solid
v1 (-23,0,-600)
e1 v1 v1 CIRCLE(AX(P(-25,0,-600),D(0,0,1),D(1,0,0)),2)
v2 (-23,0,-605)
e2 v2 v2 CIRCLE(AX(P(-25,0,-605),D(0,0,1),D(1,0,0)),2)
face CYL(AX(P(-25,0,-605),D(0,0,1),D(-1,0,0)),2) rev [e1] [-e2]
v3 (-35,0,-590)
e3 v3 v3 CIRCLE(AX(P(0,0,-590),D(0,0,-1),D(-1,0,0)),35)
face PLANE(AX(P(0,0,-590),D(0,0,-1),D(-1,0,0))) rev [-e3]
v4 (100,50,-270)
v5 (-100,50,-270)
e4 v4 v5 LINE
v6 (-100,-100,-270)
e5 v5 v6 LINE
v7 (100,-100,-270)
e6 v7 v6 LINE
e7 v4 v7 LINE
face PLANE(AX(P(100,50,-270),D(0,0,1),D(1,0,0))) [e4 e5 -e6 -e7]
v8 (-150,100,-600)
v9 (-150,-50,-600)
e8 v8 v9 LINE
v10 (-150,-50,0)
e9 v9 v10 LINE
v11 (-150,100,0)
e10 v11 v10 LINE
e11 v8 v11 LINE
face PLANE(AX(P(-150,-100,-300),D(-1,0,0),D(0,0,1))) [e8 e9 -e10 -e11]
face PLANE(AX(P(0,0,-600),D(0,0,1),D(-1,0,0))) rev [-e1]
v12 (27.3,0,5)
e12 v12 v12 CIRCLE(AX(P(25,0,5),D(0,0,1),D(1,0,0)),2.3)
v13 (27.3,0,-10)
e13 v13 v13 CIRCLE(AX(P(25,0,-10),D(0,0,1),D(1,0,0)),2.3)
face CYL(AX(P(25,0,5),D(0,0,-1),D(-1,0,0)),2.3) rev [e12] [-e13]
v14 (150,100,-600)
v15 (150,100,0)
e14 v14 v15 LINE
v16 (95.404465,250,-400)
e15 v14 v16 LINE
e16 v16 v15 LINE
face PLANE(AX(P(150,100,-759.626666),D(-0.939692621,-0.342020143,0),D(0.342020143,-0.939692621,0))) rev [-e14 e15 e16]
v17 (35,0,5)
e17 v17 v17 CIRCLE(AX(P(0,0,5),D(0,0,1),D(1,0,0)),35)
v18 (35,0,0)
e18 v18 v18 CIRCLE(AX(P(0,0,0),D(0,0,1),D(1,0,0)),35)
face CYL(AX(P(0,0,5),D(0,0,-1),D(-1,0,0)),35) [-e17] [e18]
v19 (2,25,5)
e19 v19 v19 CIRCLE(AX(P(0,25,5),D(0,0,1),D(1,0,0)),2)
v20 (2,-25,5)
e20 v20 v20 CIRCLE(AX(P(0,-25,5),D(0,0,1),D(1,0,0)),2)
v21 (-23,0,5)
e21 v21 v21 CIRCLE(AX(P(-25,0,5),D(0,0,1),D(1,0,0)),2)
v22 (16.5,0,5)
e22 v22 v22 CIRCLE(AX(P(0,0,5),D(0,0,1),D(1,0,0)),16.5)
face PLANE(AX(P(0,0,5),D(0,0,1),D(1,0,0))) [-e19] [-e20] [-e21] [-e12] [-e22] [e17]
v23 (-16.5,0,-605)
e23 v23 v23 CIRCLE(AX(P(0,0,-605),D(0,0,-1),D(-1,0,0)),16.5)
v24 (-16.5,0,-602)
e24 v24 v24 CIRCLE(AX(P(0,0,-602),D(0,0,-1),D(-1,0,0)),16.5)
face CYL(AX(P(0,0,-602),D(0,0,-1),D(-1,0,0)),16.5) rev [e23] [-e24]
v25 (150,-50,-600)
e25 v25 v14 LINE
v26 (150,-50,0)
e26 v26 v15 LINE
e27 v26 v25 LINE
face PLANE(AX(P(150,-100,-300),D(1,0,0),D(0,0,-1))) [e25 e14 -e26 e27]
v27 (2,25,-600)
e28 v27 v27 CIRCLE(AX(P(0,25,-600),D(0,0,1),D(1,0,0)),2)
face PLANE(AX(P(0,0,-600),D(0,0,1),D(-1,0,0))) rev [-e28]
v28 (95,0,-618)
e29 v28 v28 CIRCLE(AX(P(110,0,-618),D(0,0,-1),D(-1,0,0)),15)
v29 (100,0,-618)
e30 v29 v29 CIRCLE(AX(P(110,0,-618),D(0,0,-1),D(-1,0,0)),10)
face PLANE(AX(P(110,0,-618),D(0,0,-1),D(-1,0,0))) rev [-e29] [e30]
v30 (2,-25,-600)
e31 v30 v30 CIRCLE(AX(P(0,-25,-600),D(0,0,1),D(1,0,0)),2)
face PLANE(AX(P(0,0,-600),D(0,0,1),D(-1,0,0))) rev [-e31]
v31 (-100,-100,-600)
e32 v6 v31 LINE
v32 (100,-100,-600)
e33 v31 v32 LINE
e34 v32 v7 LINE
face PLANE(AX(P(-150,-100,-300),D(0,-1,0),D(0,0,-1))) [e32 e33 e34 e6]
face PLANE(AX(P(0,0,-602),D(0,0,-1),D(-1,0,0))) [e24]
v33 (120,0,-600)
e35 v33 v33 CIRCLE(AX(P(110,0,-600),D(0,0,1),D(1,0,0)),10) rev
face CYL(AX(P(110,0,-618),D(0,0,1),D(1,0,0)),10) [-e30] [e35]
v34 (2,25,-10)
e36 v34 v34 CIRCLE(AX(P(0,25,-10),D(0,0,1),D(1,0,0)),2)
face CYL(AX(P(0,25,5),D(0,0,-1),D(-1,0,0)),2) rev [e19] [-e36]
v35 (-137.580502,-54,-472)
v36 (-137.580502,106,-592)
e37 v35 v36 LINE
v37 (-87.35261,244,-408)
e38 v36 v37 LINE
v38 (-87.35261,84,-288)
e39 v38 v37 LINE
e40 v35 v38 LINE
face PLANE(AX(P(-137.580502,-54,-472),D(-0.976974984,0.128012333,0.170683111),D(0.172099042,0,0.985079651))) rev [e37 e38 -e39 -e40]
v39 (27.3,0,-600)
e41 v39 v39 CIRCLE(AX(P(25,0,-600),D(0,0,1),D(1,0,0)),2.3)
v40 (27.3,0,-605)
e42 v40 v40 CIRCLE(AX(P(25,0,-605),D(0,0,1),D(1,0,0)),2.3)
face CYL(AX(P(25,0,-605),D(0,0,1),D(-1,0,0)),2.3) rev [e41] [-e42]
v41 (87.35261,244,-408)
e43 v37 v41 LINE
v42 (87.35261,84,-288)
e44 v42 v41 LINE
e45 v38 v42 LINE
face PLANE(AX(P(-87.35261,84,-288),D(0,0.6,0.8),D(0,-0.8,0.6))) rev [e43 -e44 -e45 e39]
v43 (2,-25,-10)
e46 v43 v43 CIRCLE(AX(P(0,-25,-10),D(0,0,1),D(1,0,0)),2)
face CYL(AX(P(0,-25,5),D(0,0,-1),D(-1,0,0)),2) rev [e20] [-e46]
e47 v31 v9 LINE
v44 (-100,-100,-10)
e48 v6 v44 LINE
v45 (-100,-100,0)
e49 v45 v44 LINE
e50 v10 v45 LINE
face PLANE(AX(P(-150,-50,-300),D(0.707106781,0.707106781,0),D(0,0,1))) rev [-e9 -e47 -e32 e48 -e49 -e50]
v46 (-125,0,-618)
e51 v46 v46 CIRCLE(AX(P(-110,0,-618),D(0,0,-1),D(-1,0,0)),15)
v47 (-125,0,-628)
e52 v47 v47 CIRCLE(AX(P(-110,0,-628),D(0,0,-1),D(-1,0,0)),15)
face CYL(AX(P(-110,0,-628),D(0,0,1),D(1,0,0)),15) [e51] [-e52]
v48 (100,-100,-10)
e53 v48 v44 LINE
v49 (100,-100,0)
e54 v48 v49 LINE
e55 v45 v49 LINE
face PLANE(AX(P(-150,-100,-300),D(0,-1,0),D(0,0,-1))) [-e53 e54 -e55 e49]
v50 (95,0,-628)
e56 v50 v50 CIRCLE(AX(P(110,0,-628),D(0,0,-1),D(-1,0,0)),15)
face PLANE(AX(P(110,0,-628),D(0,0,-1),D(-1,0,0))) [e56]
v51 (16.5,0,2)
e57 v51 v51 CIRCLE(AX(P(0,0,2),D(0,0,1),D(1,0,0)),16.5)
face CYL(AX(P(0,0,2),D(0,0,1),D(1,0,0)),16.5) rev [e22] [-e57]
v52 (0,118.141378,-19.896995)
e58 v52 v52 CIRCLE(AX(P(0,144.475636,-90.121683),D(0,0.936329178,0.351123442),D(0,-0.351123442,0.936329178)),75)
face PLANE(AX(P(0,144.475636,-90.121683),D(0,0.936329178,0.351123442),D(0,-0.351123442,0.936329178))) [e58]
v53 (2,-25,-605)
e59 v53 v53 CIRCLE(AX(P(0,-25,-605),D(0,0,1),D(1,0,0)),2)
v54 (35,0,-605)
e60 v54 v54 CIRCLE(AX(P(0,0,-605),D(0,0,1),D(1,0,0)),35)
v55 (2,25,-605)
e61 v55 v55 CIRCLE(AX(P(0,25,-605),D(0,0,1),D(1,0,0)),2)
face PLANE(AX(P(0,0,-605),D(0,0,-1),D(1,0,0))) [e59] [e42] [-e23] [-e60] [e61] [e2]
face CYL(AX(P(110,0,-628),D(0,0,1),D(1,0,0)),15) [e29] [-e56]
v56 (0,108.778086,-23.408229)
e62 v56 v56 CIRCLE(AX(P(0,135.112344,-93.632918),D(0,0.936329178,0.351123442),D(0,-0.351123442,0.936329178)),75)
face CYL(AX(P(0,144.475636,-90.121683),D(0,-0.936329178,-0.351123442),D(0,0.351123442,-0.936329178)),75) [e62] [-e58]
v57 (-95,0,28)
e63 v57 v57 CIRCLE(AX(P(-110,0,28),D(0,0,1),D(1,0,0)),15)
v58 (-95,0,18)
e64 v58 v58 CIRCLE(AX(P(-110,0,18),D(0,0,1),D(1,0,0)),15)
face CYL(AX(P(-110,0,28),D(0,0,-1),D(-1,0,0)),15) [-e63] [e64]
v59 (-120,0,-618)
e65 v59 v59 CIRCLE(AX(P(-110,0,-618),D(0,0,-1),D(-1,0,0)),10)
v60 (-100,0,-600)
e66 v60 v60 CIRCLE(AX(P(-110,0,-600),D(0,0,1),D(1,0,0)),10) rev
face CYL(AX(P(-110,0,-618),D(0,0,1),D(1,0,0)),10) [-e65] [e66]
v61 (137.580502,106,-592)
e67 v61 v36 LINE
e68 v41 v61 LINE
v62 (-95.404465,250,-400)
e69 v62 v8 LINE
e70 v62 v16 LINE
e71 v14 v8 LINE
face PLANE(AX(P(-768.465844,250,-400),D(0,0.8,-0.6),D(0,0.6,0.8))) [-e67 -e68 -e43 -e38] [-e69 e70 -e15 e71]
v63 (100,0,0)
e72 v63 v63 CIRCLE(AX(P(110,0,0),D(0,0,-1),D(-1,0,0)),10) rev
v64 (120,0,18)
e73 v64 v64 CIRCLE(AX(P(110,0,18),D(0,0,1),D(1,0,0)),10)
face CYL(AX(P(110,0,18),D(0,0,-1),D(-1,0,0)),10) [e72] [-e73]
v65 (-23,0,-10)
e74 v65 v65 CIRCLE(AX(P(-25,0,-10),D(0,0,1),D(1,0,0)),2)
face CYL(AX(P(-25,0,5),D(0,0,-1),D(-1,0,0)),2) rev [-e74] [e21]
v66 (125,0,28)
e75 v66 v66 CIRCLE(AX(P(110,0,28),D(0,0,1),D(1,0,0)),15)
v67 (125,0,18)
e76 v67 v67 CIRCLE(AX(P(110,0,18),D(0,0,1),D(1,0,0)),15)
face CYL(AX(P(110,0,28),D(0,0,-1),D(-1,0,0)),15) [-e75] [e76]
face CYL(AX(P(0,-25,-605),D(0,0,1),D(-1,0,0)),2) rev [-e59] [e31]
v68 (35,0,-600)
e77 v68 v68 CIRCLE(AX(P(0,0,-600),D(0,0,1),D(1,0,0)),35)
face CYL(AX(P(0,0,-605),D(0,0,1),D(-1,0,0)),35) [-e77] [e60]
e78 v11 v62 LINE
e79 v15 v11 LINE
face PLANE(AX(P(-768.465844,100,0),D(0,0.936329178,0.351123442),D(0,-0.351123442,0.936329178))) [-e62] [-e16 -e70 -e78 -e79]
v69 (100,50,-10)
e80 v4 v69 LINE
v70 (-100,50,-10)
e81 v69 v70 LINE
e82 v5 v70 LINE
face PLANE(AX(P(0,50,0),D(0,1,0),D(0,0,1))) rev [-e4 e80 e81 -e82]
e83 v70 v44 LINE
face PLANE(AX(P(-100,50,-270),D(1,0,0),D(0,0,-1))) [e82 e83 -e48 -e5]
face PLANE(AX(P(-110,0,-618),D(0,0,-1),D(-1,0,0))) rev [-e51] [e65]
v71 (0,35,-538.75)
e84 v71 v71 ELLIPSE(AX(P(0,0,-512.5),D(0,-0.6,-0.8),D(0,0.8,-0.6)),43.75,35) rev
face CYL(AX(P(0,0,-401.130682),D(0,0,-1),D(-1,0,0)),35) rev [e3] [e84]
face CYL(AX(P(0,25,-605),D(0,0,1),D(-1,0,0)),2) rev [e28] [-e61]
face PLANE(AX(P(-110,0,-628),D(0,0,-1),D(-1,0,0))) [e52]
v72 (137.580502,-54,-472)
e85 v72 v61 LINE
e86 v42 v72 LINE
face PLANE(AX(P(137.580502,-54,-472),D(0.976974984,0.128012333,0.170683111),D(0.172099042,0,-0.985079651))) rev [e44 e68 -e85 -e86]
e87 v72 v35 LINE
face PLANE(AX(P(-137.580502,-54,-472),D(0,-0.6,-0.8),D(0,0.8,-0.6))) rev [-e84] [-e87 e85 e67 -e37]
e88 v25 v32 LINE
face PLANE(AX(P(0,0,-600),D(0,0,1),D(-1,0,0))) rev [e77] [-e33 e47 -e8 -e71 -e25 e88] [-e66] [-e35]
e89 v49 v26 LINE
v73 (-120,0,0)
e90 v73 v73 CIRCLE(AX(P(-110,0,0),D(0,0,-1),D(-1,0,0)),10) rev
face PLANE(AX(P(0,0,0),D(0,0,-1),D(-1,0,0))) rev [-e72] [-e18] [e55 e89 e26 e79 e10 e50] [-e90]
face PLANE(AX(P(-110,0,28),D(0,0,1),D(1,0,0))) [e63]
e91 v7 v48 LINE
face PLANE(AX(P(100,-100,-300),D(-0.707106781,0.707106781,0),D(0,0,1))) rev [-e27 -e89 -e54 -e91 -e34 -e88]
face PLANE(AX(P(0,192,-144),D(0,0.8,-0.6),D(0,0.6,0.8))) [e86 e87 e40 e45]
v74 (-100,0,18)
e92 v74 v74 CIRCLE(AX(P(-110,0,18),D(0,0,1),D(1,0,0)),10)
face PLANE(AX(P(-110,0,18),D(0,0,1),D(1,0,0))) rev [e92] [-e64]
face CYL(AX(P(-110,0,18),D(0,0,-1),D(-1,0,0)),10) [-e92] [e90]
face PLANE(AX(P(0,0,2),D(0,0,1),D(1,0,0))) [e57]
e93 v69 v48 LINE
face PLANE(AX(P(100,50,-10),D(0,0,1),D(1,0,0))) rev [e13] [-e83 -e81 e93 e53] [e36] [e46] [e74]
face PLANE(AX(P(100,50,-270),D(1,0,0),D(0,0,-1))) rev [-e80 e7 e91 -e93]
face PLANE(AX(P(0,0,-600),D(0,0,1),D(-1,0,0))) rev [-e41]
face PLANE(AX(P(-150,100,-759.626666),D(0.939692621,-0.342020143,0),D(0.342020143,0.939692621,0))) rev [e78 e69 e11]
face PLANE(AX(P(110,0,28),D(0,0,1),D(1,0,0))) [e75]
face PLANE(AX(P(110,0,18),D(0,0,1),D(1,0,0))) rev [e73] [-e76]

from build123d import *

# Parameters (mm, degrees)
SKETCH3_W            = 300
SKETCH3_H            = 200
BOSS_EXTRUDE2_DEPTH  = 300
SKETCH8_R            = 35
SKETCH8_R_2          = 2
SKETCH8_R_3          = 2.3
BOSS_EXTRUDE7_DEPTH  = 5
BOSS_EXTRUDE8_DEPTH  = 300
SKETCH19_W           = 200
SKETCH19_H           = 260
CUT_EXTRUDE5_DEPTH   = 150
CUT_EXTRUDE3_REACH   = 673.584
CUT_EXTRUDE4_DEPTH   = 200
CHAMFER2_SIZE        = 50
SKETCH4_R            = 10
BOSS_EXTRUDE9_DEPTH  = 18
SKETCH15_R           = 15
BOSS_EXTRUDE10_DEPTH = 10
BOSS_EXTRUDE11_START = 18
SKETCH16_R           = 10
BOSS_EXTRUDE11_DEPTH = 18
BOSS_EXTRUDE12_START = 10
SKETCH17_R           = 15
BOSS_EXTRUDE12_DEPTH = 10
SKETCH18_R           = 75
BOSS_EXTRUDE13_DEPTH = 10
CUT_EXTRUDE6_REACH   = 685.318
SKETCH20_R           = 35
SKETCH21_R           = 16.5
CUT_EXTRUDE7_DEPTH   = 3
CUT_EXTRUDE8_START   = -3
SKETCH22_R           = 16.5
CUT_EXTRUDE8_DEPTH   = 3
SKETCH23_R           = 2
SKETCH23_R_2         = 2.3
CUT_EXTRUDE9_DEPTH   = 20


with BuildPart() as part:
    # Sketch3 → Boss-Extrude2 (new body)
    with BuildSketch(Plane.XY):
        Rectangle(SKETCH3_W, SKETCH3_H)
    extrude(amount=-BOSS_EXTRUDE2_DEPTH)

    # Sketch8 → Boss-Extrude7 (add)
    with BuildSketch(Plane.XY):
        Circle(SKETCH8_R)
        with Locations((0, 25)):
            Circle(SKETCH8_R_2, mode=Mode.SUBTRACT)
        with Locations((0, -25)):
            Circle(SKETCH8_R_2, mode=Mode.SUBTRACT)
        with Locations((25, 0)):
            Circle(SKETCH8_R_3, mode=Mode.SUBTRACT)
        with Locations((-25, 0)):
            Circle(SKETCH8_R_2, mode=Mode.SUBTRACT)
    extrude(amount=BOSS_EXTRUDE7_DEPTH)

    # Mirror1: part across plane


with BuildPart() as part_1:
    add(part.part)
    add(part.part.mirror(Plane(origin=(0, 0, -300), x_dir=(1, 0, 0), z_dir=(0, 0, -1))))

    # Sketch10 → Boss-Extrude8 (add)
    with BuildSketch(Plane(origin=(150, 0, 0), x_dir=(0, 0, -1), z_dir=(1, 0, 0))):
        Polygon((0, 100), (400, 250), (600, 100), align=None)
    extrude(amount=-BOSS_EXTRUDE8_DEPTH)

    # Sketch19 → Cut-Extrude5 (cut)
    with BuildSketch(Plane.XZ.offset(100)):
        with Locations((0, -140)):
            Rectangle(SKETCH19_W, SKETCH19_H)
    extrude(amount=-CUT_EXTRUDE5_DEPTH, mode=Mode.SUBTRACT)

    # Cut-Extrude3: up to this plane
    cut_extrude3_end = Plane(origin=(-768.465843843, 250, -400), z_dir=(0, 0.7999999999999999, -0.6000000000000001))
    # Sketch11 → Cut-Extrude3 (cut, up to the surface)
    with BuildSketch(Plane.XY, mode=Mode.PRIVATE) as cut_extrude3_sk1:
        Polygon((150, 100), (95.40446486, 250), (150, 250), align=None)
    cut_extrude3_tool1 = split(extrude(cut_extrude3_sk1.sketch, amount=-CUT_EXTRUDE3_REACH, mode=Mode.PRIVATE), bisect_by=cut_extrude3_end, keep=Keep.BOTH, mode=Mode.PRIVATE)
    add(cut_extrude3_tool1.solids().sort_by_distance((131.801488, 200, 0))[0], mode=Mode.SUBTRACT)
    # Sketch11 → Cut-Extrude3 (cut, up to the surface)
    with BuildSketch(Plane.XY, mode=Mode.PRIVATE) as cut_extrude3_sk2:
        Polygon((-150, 100), (-95.40446486, 250), (-150, 250), align=None)
    cut_extrude3_tool2 = split(extrude(cut_extrude3_sk2.sketch, amount=-CUT_EXTRUDE3_REACH, mode=Mode.PRIVATE), bisect_by=cut_extrude3_end, keep=Keep.BOTH, mode=Mode.PRIVATE)
    add(cut_extrude3_tool2.solids().sort_by_distance((-131.801488, 200, 0))[0], mode=Mode.SUBTRACT)

    # Sketch14 → Cut-Extrude4 (cut)
    with BuildSketch(Plane(origin=(0, 352, -264), x_dir=(1, 0, 0), z_dir=(0, 0.7999999999999999, -0.6000000000000002))):
        Polygon((-137.580501971, 410), (137.580501971, 410), (87.352609643, 180), (-87.352609643, 180), align=None)
    extrude(amount=-CUT_EXTRUDE4_DEPTH, mode=Mode.SUBTRACT)

    # Chamfer2
    chamfer2_edges = [part_1.edges().sort_by_distance(p)[0] for p in [
        (150, -100, -300),
        (-150, -100, -300),
    ]]
    chamfer(chamfer2_edges, length=CHAMFER2_SIZE - 0.0001)  # a hair under: the kernel refuses the full size

    # Sketch4 → Boss-Extrude9 (add)
    with BuildSketch(Plane.XY):
        with Locations(Location((-110, 0, 0), (0, 0, 180))):
            Circle(SKETCH4_R)
        with Locations(Location((110, 0, 0), (0, 0, 180))):
            Circle(SKETCH4_R)
    extrude(amount=BOSS_EXTRUDE9_DEPTH)

    # Sketch15 → Boss-Extrude10 (add)
    with BuildSketch(Plane.XY.offset(18)):
        with Locations((-110, 0)):
            Circle(SKETCH15_R)
        with Locations((110, 0)):
            Circle(SKETCH15_R)
    extrude(amount=BOSS_EXTRUDE10_DEPTH)

    # Sketch16 → Boss-Extrude11 (add)
    with BuildSketch(Plane(origin=(0, 0, -600), x_dir=(-1, 0, 0), z_dir=(0, 0, -1)).offset(BOSS_EXTRUDE11_START)):
        with Locations((110, 0)):
            Circle(SKETCH16_R)
        with Locations((-110, 0)):
            Circle(SKETCH16_R)
    extrude(amount=-BOSS_EXTRUDE11_DEPTH)

    # Sketch17 → Boss-Extrude12 (add)
    with BuildSketch(Plane(origin=(0, 0, -618), x_dir=(-1, 0, 0), z_dir=(0, 0, -1)).offset(BOSS_EXTRUDE12_START)):
        with Locations(Location((-110, 0, 0), (0, 0, 180))):
            Circle(SKETCH17_R)
        with Locations(Location((110, 0, 0), (0, 0, 180))):
            Circle(SKETCH17_R)
    extrude(amount=-BOSS_EXTRUDE12_DEPTH)

    # Sketch18 → Boss-Extrude13 (add)
    with BuildSketch(Plane(origin=(0, 87.671232877, 32.876712329), x_dir=(1, 0, 0), z_dir=(0, 0.9363291775690445, 0.35112344158839187))):
        with Locations(Location((0, 135.112344159, 0), (0, 0, 270))):
            Circle(SKETCH18_R)
    extrude(amount=BOSS_EXTRUDE13_DEPTH)

    # Cut-Extrude6: up to this plane
    cut_extrude6_end = Plane(origin=(-137.580501971, -54, -472), z_dir=(0, -0.6000000000000002, -0.7999999999999999))
    # Sketch20 → Cut-Extrude6 (cut, up to the surface)
    with BuildSketch(Plane(origin=(0, 0, -590), x_dir=(-1, 0, 0), z_dir=(0, 0, -1)), mode=Mode.PRIVATE) as cut_extrude6_sk1:
        with Locations(Location((0, 0, 0), (0, 0, 180))):
            Circle(SKETCH20_R)
    cut_extrude6_tool1 = split(extrude(cut_extrude6_sk1.sketch, amount=-CUT_EXTRUDE6_REACH, mode=Mode.PRIVATE), bisect_by=cut_extrude6_end, keep=Keep.BOTH, mode=Mode.PRIVATE)
    add(cut_extrude6_tool1.solids().sort_by_distance((0, 0, -590))[0], mode=Mode.SUBTRACT)

    # Sketch21 → Cut-Extrude7 (cut)
    with BuildSketch(Plane(origin=(0, 0, -605), x_dir=(-1, 0, 0), z_dir=(0, 0, -1))):
        Circle(SKETCH21_R)
    extrude(amount=-CUT_EXTRUDE7_DEPTH, mode=Mode.SUBTRACT)

    # Sketch22 → Cut-Extrude8 (cut)
    with BuildSketch(Plane.XY.offset(5).offset(CUT_EXTRUDE8_START)):
        with Locations(Location((0, 0, 0), (0, 0, 180))):
            Circle(SKETCH22_R)
    extrude(amount=CUT_EXTRUDE8_DEPTH, mode=Mode.SUBTRACT)

    # Sketch23 → Cut-Extrude9 (cut)
    with BuildSketch(Plane.XY.offset(5)):
        with Locations((0, 25)):
            Circle(SKETCH23_R)
        with Locations((25, 0)):
            Circle(SKETCH23_R_2)
        with Locations((0, -25)):
            Circle(SKETCH23_R)
        with Locations((-25, 0)):
            Circle(SKETCH23_R)
    extrude(amount=-CUT_EXTRUDE9_DEPTH, mode=Mode.SUBTRACT)


solid = part_1.part
